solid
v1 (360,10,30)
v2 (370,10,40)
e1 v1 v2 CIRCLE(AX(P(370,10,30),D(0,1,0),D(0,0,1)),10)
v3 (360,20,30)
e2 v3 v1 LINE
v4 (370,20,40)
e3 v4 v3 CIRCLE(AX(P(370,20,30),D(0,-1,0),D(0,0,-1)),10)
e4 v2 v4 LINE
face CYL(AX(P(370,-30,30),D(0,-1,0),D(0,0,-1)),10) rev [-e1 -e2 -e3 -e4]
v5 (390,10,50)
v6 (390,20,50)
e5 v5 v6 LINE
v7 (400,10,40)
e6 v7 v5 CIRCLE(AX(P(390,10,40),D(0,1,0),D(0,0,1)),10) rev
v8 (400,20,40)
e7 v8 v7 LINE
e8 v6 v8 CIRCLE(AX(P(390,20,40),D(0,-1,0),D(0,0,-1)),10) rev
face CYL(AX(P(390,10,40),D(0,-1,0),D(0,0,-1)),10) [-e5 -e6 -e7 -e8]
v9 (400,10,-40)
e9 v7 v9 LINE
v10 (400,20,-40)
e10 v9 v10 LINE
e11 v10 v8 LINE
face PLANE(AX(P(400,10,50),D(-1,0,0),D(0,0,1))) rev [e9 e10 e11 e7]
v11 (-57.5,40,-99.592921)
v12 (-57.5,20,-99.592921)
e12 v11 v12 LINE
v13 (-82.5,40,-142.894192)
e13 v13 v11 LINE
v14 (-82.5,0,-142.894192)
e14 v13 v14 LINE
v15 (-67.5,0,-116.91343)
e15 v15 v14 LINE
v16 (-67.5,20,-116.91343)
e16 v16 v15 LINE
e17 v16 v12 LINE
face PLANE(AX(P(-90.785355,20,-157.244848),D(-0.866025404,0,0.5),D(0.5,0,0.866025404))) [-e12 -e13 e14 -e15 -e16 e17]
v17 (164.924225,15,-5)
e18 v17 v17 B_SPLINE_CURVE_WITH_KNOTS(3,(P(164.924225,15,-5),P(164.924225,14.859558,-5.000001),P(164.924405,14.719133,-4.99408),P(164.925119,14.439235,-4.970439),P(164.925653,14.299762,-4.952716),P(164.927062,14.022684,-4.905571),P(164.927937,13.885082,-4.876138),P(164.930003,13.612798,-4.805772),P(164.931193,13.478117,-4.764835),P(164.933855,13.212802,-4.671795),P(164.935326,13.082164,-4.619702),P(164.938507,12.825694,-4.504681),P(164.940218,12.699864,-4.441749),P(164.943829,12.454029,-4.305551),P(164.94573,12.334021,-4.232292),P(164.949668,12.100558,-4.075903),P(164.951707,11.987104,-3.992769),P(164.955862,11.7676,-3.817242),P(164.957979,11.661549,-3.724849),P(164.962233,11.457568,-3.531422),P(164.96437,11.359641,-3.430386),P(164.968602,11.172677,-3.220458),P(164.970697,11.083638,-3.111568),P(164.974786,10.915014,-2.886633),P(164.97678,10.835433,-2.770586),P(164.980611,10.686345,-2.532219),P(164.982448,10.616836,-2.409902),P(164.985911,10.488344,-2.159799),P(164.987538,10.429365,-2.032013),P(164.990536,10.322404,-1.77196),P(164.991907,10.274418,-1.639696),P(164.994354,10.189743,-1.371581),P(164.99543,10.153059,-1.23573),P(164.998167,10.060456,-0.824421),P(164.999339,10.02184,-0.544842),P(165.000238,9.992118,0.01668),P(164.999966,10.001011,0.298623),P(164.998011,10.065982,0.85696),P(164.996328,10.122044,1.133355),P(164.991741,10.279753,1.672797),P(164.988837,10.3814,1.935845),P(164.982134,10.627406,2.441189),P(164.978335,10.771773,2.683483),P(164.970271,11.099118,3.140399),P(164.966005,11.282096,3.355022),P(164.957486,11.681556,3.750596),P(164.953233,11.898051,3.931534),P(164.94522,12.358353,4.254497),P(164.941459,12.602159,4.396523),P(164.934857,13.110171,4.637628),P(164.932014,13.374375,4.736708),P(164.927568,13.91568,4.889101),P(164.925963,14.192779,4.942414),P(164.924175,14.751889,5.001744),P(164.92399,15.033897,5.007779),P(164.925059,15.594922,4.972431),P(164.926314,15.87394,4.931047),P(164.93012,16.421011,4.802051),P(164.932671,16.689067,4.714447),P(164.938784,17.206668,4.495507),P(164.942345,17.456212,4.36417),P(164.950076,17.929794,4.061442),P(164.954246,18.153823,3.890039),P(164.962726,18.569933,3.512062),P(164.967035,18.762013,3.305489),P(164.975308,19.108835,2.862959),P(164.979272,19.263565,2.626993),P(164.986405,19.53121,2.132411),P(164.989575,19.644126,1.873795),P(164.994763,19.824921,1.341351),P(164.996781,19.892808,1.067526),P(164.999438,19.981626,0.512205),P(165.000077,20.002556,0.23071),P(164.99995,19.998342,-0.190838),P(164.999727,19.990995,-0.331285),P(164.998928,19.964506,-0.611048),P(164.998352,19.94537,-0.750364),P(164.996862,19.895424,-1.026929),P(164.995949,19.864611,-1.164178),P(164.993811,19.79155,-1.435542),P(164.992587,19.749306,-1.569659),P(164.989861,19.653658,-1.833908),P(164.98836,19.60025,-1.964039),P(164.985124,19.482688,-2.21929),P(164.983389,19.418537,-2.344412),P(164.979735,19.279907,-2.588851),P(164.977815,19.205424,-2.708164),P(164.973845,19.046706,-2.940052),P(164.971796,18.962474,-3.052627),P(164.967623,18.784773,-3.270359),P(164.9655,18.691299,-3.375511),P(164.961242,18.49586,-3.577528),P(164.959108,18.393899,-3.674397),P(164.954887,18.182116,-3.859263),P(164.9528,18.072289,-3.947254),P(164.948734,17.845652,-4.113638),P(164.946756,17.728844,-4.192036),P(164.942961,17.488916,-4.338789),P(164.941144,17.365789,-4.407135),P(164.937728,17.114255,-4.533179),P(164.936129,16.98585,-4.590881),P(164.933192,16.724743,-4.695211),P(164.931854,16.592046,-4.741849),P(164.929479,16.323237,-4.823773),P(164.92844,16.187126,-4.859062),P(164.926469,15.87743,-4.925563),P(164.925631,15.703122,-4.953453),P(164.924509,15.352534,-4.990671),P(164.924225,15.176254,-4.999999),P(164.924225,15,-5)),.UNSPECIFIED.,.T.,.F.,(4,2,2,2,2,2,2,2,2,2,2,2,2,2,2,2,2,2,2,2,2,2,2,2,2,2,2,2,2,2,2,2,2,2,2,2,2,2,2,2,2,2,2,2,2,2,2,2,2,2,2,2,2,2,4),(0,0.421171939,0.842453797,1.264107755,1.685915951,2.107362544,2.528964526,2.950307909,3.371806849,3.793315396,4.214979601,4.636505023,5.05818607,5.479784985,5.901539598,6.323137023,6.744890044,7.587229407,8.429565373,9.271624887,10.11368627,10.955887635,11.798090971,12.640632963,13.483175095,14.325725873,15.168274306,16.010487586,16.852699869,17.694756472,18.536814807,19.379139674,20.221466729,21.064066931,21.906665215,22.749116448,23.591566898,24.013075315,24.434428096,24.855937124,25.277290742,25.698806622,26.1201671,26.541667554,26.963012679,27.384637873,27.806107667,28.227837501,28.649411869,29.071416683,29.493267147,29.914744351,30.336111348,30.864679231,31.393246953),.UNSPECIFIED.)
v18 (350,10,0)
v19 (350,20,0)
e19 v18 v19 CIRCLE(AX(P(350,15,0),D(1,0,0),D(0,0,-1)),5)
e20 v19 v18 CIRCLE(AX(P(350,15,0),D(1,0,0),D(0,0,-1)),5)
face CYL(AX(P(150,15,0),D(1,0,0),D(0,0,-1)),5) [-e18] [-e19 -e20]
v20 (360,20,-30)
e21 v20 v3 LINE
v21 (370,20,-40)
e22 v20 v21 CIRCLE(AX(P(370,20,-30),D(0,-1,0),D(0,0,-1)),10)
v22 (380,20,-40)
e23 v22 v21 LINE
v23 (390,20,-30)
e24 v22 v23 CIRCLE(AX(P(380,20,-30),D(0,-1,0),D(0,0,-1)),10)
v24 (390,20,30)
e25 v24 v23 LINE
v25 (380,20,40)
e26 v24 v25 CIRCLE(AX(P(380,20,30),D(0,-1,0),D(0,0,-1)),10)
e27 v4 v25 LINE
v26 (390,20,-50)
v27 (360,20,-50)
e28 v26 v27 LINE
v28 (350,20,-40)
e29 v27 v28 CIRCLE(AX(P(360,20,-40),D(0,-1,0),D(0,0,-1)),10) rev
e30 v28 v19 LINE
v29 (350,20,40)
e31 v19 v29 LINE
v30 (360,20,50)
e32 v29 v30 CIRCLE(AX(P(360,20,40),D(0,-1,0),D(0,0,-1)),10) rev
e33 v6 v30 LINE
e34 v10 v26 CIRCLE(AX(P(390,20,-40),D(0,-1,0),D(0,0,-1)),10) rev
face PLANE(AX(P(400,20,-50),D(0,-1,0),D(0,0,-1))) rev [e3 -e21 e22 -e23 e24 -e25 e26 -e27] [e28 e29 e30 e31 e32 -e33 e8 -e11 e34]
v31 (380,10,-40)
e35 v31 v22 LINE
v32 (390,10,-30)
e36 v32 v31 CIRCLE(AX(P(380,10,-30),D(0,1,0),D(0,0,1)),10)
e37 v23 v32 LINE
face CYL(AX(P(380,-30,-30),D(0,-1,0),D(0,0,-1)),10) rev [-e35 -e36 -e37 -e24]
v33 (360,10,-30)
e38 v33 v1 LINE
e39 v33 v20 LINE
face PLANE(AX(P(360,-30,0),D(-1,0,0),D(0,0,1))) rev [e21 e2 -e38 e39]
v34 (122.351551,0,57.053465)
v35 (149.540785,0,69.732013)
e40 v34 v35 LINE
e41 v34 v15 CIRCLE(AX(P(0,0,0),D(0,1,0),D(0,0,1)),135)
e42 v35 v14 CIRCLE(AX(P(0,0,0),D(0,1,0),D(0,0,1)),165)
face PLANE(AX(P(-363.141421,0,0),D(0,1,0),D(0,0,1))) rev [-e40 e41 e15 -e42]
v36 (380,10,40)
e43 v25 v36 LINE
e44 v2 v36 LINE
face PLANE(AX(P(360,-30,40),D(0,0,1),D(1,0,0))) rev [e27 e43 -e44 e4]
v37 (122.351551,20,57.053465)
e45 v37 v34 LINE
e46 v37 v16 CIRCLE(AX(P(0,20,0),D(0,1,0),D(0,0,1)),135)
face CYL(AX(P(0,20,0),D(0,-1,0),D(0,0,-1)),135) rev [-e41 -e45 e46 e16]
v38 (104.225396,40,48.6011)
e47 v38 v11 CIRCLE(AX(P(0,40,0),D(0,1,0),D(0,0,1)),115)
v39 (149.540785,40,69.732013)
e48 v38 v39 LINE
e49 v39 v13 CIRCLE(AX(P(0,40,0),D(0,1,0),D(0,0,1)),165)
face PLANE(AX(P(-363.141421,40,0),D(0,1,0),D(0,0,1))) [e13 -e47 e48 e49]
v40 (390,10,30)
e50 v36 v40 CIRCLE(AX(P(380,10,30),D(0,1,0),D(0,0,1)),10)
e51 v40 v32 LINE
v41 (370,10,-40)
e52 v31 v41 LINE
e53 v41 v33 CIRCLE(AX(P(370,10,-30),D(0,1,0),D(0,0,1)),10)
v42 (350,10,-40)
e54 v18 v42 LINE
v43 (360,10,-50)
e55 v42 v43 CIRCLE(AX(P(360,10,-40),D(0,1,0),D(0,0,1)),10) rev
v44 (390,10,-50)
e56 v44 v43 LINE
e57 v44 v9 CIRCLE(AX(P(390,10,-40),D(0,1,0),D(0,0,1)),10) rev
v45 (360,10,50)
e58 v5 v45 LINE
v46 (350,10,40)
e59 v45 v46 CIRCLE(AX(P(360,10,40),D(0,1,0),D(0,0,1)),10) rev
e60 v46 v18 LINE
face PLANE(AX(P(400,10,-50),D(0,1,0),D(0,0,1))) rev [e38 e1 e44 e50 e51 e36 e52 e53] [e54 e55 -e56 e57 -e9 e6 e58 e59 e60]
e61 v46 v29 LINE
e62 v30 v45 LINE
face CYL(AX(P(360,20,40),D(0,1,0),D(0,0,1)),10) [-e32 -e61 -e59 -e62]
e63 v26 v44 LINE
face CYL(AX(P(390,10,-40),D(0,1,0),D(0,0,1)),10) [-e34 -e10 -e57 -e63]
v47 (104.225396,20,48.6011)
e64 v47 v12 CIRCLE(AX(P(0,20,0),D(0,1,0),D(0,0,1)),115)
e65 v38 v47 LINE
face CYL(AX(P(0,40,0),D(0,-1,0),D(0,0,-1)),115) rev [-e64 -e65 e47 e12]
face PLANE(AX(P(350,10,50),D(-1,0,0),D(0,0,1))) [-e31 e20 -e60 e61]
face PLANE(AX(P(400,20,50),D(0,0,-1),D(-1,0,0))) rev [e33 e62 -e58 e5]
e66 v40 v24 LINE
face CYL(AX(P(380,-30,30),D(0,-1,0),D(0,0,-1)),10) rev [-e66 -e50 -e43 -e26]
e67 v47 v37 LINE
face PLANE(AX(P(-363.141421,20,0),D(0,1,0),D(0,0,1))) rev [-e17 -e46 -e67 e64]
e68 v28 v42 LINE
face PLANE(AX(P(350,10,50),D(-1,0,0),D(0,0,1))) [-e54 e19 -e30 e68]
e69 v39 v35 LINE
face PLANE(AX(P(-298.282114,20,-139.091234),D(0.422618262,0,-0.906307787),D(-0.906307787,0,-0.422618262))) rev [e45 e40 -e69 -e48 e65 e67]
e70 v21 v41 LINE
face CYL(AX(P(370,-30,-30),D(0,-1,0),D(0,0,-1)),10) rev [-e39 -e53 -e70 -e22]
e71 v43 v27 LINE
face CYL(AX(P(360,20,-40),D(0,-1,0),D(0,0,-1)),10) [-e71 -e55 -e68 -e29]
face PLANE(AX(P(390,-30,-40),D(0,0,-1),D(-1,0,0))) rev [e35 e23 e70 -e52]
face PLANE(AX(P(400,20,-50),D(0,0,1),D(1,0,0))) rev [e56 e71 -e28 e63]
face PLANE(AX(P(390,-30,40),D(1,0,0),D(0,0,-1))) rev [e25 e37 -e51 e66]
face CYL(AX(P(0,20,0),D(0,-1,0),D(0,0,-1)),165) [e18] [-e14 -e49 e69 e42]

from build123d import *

# Parameters (mm, degrees)
BOSS_EXTRUDE1_DEPTH = 20
BOSS_EXTRUDE2_DEPTH = 20
SWEEP1_START        = 164
SWEEP1_OUTLINE_R    = 5
SWEEP1_DEPTH        = 186
SKETCH4_W           = 100
SKETCH4_H           = 10
BOSS_EXTRUDE3_DEPTH = 50
CUT_EXTRUDE1_DEPTH  = 50
FILLET1_START       = 10
FILLET1_DEPTH       = 10
FILLET1_2_DEPTH     = 10


with BuildPart() as part:
    # Sketch1 → Boss-Extrude1 (new body)
    with BuildSketch(Plane(origin=(0, 0, 0), x_dir=(1, 0, 0), z_dir=(0, 1, 0))):
        with BuildLine():
            Line((-82.5, 142.894191624), (-67.5, 116.913429511))
            ThreePointArc((-67.5, 116.913429511), (67.5, 116.913429511), (135, 0))
            ThreePointArc((135, 0), (131.799960961, -29.219347882), (122.35155125, -57.053465335))
            Line((122.35155125, -57.053465335), (149.540784861, -69.732013187))
            ThreePointArc((149.540784861, -69.732013187), (161.088841175, -35.7125363), (165, 0))
            ThreePointArc((165, 0), (82.5, 142.894191624), (-82.5, 142.894191624))
        make_face()
    extrude(amount=BOSS_EXTRUDE1_DEPTH)

    # Sketch2 → Boss-Extrude2 (add)
    with BuildSketch(Plane(origin=(0, 20, 0), x_dir=(1, 0, 0), z_dir=(0, 1, 0))):
        with BuildLine():
            ThreePointArc((122.35155125, -57.053465335), (91.204678028, 99.532440469), (-67.5, 116.913429511))
            Line((-67.5, 116.913429511), (-57.5, 99.592921435))
            ThreePointArc((-57.5, 99.592921435), (57.5, 99.592921435), (115, 0))
            ThreePointArc((115, 0), (112.274040819, -24.890555603), (104.225395509, -48.6011001))
            Line((104.225395509, -48.6011001), (122.35155125, -57.053465335))
        make_face()
        with BuildLine():
            Line((-82.5, 142.894191624), (-67.5, 116.913429511))
            ThreePointArc((-67.5, 116.913429511), (91.204678028, 99.532440469), (122.35155125, -57.053465335))
            Line((122.35155125, -57.053465335), (149.540784861, -69.732013187))
            ThreePointArc((149.540784861, -69.732013187), (111.472384257, 121.650760574), (-82.5, 142.894191624))
        make_face()
    extrude(amount=BOSS_EXTRUDE2_DEPTH)

    # Sweep1: read off the stored shape, not the designer's step
    # Sweep1 outline → Sweep1 (add)
    with BuildSketch(Plane.YZ.offset(SWEEP1_START)):
        with Locations((15, 0)):
            Circle(SWEEP1_OUTLINE_R)
    extrude(amount=SWEEP1_DEPTH)

    # Sketch4 → Boss-Extrude3 (add)
    with BuildSketch(Plane(origin=(350, 0, 0), x_dir=(1.4081184135372707e-12, 0, -1.0), z_dir=(1.0, 0, 1.4081184135372707e-12))):
        with Locations((0, 15)):
            Rectangle(SKETCH4_W, SKETCH4_H)
    extrude(amount=BOSS_EXTRUDE3_DEPTH)

    # Sketch5 → Cut-Extrude1 (cut)
    with BuildSketch(Plane(origin=(0, 20, 0), x_dir=(1, 0, 0), z_dir=(0, 1, 0))):
        Polygon((360, 40), (360, 0), (360, -40), (390, -40), (390, 40), align=None)
    extrude(amount=-CUT_EXTRUDE1_DEPTH, mode=Mode.SUBTRACT)

    # Fillet1: read off the stored shape, not the designer's step
    # Fillet1 outline → Fillet1 (cut)
    with BuildSketch(Plane(origin=(0, 0, 0), x_dir=(1, 0, 0), z_dir=(0, 1, 0)).offset(FILLET1_START)):
        with BuildLine():
            ThreePointArc((390, 50), (397.071067812, 47.071067812), (400, 40))
            Line((400, 40), (400, 50))
            Line((400, 50), (390, 50))
        make_face()
        with BuildLine():
            Line((400, -50), (400, -40))
            ThreePointArc((400, -40), (397.071067812, -47.071067812), (390, -50))
            Line((390, -50), (400, -50))
        make_face()
        with BuildLine():
            ThreePointArc((350, 40), (352.928932188, 47.071067812), (360, 50))
            Line((360, 50), (350, 50))
            Line((350, 50), (350, 40))
        make_face()
        with BuildLine():
            Line((350, -50), (360, -50))
            ThreePointArc((360, -50), (352.928932188, -47.071067812), (350, -40))
            Line((350, -40), (350, -50))
        make_face()
    extrude(amount=FILLET1_DEPTH, mode=Mode.SUBTRACT)

    # Fillet1 2 outline → Fillet1 2 (add)
    with BuildSketch(Plane(origin=(0, 0, 0), x_dir=(1, 0, 0), z_dir=(0, 1, 0)).offset(FILLET1_START)):
        with BuildLine():
            Line((390, -40), (390, -30))
            ThreePointArc((390, -30), (387.071067812, -37.071067812), (380, -40))
            Line((380, -40), (390, -40))
        make_face()
        with BuildLine():
            ThreePointArc((380, 40), (387.071067812, 37.071067812), (390, 30))
            Line((390, 30), (390, 40))
            Line((390, 40), (380, 40))
        make_face()
        with BuildLine():
            Line((360, -40), (370, -40))
            ThreePointArc((370, -40), (362.928932188, -37.071067812), (360, -30))
            Line((360, -30), (360, -40))
        make_face()
        with BuildLine():
            ThreePointArc((360, 30), (362.928932188, 37.071067812), (370, 40))
            Line((370, 40), (360, 40))
            Line((360, 40), (360, 30))
        make_face()
    extrude(amount=FILLET1_2_DEPTH)


solid = part.part
